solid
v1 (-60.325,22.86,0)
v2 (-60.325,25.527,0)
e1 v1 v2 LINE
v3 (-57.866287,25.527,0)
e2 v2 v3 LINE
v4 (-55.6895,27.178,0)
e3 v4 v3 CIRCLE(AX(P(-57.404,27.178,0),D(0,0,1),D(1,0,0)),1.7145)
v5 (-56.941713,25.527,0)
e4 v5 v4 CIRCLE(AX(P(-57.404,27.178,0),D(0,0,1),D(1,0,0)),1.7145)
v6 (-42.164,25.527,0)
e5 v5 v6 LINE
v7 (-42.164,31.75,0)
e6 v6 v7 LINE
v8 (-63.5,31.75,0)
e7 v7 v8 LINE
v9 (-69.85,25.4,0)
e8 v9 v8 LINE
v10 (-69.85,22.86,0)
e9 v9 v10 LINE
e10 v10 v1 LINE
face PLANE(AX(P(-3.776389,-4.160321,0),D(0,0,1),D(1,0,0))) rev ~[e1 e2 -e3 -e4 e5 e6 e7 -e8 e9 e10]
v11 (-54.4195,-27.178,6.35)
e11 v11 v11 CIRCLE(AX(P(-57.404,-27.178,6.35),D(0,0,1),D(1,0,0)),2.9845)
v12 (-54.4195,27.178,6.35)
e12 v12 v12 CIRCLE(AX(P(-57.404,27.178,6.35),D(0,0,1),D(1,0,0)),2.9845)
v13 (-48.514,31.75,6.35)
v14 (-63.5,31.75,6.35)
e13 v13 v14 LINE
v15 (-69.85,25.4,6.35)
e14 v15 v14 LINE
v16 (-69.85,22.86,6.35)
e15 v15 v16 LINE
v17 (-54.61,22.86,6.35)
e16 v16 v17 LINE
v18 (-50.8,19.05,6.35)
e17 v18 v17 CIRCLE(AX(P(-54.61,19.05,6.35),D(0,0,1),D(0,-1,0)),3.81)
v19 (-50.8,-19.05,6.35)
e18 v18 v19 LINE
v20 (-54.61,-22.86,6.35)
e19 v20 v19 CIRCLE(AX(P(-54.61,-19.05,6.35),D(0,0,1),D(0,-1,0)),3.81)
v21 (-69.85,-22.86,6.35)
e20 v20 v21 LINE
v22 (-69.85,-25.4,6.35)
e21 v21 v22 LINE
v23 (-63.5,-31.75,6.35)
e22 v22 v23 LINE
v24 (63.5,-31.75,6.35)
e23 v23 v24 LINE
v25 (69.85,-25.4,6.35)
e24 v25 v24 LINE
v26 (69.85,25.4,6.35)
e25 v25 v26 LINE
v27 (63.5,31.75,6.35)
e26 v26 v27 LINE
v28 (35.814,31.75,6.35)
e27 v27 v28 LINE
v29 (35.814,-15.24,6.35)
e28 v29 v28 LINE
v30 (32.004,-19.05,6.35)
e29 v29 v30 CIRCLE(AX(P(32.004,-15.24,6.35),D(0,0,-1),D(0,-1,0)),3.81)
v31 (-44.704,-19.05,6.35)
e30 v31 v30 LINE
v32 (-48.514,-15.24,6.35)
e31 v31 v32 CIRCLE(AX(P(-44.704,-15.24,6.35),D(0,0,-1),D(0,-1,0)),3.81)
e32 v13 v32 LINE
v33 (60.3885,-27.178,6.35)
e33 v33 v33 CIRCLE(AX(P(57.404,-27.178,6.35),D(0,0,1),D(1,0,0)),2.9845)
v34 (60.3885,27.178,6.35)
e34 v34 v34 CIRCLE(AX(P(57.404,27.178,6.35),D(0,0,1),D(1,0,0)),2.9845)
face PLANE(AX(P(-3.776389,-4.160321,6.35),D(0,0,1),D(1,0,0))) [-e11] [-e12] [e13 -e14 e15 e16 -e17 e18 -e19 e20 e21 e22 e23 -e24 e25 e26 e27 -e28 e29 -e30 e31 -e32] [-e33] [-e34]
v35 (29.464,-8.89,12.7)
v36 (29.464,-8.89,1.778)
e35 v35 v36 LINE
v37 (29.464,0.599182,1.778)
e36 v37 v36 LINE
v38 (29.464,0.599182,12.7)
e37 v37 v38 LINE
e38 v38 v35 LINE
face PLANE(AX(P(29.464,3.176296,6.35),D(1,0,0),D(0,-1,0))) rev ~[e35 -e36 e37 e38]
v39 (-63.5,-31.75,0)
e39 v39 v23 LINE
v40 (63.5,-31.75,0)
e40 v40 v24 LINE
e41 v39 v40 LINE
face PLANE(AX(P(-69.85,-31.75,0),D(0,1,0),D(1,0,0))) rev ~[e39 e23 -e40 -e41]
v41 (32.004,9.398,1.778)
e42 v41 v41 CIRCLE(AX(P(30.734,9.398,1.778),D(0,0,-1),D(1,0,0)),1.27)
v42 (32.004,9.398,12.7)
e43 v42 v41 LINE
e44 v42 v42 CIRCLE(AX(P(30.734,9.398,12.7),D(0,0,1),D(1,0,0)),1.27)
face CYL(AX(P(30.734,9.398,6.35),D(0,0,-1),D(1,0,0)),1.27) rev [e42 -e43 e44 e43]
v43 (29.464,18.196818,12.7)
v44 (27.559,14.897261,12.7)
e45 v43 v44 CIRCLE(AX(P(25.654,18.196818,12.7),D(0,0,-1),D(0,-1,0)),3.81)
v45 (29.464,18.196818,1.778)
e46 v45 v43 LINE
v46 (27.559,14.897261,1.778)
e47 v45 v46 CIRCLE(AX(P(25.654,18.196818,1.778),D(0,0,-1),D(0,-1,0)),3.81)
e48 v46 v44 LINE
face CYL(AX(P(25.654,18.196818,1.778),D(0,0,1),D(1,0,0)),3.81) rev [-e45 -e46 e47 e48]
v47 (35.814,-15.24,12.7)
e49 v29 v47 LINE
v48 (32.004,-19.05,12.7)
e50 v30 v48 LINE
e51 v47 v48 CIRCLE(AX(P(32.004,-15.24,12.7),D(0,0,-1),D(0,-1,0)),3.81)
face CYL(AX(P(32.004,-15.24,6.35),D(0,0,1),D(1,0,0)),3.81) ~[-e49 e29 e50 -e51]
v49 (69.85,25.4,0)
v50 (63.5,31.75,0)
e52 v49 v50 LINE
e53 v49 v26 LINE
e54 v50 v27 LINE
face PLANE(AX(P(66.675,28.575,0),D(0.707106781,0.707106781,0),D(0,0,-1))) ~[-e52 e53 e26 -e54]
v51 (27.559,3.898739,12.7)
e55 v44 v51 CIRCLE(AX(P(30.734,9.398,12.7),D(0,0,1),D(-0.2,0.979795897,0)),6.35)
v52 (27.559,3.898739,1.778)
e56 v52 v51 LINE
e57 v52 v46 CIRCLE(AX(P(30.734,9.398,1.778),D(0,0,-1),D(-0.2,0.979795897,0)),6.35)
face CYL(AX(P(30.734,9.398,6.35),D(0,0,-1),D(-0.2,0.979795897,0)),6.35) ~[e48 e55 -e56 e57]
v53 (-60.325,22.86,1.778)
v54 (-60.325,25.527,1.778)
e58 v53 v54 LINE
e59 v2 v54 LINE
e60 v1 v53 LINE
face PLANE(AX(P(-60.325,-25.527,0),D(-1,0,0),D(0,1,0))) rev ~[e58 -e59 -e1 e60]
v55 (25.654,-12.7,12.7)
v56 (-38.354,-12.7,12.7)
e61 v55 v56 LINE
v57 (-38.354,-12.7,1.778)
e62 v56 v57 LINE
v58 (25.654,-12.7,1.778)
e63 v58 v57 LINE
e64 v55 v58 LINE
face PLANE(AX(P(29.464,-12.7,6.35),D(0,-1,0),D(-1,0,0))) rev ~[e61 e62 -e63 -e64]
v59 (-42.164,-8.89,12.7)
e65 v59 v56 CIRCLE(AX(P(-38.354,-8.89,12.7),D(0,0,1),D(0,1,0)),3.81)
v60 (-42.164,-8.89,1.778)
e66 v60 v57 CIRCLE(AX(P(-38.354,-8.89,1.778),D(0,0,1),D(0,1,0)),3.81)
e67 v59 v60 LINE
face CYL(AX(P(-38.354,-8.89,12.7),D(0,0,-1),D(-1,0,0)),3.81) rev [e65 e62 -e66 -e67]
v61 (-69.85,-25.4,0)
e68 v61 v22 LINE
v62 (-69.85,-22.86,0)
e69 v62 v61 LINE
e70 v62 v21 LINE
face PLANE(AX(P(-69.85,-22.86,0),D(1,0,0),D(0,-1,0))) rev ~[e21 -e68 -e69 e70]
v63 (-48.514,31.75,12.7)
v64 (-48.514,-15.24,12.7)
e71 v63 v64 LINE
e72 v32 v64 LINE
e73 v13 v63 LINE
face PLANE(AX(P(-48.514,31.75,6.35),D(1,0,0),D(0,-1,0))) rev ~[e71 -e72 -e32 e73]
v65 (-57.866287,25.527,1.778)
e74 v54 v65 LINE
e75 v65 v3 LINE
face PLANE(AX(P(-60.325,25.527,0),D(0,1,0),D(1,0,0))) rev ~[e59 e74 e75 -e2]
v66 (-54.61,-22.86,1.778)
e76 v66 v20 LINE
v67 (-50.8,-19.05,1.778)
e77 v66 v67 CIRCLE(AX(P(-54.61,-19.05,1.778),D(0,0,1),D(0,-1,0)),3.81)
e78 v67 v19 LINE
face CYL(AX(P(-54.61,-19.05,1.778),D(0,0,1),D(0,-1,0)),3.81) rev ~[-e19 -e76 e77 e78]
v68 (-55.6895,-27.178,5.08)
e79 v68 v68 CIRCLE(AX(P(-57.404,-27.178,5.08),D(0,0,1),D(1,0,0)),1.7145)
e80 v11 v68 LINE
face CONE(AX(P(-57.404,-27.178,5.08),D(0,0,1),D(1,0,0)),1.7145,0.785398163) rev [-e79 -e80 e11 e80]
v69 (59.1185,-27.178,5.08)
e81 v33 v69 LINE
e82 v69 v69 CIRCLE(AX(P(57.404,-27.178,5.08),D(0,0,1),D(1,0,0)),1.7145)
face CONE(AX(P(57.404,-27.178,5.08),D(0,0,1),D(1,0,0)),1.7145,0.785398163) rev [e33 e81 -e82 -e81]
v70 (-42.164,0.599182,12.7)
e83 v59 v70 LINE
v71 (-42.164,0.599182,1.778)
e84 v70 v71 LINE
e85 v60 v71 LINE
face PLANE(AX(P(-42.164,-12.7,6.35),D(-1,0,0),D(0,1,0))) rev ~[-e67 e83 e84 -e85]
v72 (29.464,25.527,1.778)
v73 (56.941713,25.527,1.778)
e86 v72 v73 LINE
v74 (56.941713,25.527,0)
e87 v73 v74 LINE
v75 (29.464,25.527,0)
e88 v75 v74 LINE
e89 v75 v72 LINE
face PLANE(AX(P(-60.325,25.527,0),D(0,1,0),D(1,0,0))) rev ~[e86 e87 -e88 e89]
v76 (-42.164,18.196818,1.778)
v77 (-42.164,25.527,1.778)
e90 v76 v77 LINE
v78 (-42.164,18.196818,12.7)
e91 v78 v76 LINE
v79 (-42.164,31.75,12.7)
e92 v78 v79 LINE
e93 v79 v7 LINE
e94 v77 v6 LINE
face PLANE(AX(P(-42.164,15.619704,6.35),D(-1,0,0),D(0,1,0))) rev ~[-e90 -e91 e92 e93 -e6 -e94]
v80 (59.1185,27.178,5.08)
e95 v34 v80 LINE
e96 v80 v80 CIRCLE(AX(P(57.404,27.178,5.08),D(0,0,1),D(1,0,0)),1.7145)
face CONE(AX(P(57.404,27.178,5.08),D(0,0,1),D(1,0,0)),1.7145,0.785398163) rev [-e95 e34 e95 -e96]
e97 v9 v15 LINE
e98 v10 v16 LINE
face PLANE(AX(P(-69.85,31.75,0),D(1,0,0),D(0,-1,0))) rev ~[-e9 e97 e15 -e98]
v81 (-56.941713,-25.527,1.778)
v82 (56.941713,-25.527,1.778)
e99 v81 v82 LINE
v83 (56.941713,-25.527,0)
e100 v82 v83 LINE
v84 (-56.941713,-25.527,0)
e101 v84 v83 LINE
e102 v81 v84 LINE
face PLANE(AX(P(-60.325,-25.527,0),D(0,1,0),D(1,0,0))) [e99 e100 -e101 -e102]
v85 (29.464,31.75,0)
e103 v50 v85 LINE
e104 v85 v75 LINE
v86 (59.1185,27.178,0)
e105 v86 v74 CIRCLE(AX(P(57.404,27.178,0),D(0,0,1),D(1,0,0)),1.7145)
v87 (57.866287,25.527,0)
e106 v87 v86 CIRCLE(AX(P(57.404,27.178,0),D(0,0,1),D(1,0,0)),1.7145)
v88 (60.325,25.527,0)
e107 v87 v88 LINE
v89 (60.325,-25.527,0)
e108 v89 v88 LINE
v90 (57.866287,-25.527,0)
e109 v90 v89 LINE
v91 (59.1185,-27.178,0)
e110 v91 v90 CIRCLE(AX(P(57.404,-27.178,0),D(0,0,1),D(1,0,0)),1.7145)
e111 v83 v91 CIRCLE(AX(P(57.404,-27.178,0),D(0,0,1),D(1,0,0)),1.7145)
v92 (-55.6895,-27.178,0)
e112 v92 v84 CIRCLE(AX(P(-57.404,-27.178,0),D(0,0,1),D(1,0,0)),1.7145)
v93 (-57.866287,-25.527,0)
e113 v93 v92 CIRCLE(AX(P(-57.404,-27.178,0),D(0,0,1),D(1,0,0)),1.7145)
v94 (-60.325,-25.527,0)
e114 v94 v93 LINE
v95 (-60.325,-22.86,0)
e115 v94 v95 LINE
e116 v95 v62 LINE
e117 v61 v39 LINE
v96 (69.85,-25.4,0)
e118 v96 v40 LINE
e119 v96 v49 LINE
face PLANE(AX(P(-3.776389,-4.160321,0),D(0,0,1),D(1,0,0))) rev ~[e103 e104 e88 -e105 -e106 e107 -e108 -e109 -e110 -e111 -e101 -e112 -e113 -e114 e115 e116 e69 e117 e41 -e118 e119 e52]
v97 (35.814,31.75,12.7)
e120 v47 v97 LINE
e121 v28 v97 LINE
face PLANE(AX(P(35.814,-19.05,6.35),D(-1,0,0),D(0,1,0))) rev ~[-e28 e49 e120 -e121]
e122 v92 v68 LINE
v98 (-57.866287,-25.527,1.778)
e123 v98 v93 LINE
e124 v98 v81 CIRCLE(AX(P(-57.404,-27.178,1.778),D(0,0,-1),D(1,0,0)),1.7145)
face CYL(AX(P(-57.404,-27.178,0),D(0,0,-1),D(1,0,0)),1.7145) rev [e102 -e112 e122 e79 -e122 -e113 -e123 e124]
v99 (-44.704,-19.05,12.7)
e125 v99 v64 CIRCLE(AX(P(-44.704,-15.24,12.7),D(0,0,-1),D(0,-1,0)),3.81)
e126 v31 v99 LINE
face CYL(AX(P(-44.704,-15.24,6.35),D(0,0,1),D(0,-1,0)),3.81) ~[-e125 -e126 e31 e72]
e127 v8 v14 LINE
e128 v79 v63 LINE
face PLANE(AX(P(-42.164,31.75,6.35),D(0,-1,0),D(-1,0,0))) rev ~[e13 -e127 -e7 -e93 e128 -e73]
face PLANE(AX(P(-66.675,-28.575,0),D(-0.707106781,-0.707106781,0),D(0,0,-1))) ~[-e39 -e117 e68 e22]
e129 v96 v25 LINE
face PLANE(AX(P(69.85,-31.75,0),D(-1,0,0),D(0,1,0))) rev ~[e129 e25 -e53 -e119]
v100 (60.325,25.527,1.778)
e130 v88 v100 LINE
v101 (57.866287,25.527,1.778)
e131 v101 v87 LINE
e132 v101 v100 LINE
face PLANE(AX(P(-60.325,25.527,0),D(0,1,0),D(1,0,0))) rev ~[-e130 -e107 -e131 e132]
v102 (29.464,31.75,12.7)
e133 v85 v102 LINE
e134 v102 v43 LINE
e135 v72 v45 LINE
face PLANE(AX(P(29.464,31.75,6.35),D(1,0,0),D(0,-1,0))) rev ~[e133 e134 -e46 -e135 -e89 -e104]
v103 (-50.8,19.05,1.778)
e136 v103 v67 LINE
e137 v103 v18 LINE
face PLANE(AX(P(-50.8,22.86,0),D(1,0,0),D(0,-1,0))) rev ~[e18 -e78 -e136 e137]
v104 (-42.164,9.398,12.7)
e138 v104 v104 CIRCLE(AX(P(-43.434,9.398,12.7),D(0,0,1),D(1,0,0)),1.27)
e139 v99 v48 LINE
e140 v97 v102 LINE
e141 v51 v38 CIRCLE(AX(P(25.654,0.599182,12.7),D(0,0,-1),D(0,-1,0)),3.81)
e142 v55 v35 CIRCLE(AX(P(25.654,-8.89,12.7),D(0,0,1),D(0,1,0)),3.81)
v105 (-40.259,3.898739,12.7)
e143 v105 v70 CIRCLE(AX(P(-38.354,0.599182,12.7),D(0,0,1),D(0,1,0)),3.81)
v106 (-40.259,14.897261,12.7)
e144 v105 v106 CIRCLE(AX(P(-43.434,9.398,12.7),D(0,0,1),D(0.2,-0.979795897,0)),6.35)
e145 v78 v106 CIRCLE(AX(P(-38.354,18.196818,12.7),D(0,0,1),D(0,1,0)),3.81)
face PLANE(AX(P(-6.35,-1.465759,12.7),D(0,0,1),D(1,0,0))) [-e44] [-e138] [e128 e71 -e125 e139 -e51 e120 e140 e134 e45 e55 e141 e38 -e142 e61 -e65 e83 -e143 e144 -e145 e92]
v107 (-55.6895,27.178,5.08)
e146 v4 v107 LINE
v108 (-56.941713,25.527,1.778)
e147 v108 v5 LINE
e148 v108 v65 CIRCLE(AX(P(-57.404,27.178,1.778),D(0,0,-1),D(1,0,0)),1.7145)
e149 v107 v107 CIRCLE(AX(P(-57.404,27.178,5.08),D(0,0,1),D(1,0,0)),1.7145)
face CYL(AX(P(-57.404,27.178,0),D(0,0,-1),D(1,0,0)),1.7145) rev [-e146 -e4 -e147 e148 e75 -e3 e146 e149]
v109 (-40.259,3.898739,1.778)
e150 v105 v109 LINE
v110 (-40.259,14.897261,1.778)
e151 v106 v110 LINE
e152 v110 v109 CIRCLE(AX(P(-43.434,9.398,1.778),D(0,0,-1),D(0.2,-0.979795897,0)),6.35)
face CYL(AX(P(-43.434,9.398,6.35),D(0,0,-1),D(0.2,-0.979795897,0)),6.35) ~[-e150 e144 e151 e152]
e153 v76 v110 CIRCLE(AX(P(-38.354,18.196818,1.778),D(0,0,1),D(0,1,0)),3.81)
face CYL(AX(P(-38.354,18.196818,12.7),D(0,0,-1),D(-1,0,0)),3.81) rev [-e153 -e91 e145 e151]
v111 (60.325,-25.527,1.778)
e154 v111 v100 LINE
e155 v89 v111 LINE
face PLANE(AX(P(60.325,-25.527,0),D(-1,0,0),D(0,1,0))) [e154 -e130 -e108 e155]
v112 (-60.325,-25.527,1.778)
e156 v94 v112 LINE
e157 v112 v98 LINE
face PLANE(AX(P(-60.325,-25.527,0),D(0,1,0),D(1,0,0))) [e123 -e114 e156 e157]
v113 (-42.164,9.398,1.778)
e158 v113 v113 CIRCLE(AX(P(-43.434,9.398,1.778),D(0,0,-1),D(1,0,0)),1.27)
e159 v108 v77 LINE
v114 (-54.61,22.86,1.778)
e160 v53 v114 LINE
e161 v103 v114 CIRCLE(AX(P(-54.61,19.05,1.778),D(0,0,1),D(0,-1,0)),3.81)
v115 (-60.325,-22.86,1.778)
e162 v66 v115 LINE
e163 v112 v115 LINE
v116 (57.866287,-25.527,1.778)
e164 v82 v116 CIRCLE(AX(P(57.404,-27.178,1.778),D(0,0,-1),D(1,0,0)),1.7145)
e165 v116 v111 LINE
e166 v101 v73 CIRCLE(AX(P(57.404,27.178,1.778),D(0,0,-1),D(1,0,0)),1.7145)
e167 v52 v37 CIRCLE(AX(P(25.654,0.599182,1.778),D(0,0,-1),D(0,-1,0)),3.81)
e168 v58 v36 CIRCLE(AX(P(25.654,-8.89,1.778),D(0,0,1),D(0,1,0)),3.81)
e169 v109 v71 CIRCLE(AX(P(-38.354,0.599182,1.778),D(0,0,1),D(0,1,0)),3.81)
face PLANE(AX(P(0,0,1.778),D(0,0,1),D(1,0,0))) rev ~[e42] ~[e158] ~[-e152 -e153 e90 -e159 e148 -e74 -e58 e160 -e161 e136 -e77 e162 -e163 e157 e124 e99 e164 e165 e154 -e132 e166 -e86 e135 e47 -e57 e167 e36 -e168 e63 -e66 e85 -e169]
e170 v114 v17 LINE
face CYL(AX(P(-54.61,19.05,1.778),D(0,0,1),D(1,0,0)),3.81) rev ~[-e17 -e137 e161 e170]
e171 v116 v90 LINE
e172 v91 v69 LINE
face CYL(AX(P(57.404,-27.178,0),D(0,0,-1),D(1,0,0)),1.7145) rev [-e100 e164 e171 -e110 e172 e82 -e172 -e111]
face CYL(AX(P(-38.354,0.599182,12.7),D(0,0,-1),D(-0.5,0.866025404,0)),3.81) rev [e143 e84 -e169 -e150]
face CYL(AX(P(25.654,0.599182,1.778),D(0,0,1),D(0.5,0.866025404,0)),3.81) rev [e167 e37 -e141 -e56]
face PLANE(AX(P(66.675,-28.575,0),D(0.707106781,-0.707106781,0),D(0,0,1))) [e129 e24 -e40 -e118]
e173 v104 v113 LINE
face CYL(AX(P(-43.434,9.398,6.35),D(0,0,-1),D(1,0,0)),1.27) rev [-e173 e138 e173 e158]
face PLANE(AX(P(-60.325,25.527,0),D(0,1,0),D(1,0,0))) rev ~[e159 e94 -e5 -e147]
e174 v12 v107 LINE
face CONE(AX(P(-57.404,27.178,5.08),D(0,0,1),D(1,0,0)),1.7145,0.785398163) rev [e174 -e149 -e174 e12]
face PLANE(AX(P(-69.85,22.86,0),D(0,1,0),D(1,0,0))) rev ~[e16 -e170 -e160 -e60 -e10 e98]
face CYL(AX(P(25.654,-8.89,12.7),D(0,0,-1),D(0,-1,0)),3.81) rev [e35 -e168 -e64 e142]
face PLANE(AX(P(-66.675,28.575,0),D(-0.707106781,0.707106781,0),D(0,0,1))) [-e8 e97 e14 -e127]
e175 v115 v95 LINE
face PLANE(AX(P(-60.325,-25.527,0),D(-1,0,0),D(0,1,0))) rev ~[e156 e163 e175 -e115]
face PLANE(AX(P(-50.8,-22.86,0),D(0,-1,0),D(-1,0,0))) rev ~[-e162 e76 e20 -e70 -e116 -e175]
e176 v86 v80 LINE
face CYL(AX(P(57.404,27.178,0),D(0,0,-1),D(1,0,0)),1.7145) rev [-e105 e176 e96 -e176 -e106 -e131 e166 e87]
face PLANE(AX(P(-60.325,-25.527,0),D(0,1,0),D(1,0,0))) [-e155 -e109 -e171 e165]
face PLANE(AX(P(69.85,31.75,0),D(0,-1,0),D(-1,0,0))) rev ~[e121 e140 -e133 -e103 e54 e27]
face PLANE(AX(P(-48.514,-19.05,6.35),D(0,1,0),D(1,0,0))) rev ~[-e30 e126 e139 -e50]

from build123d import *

# Parameters (mm, degrees)
F0_R     = 1.7145
F0_R_2   = 1.27
F1_DEPTH = 6.35
F2_W     = 120.65
F2_H     = 51.054
F3_DEPTH = 1.778
F4_R     = 1.27
F5_DEPTH = 6.35
F6_SIZE  = 6.35
F7_R     = 3.81
F8_SIZE  = 1.27


# Not quite as in the source:
# - a feature names something its author has since deleted; it is built from what else it names


with BuildPart() as f1:
    # F0 (on Top) → F1 (new body)
    with BuildSketch(Plane.XY):
        with BuildLine():
            Line((69.85, -31.75), (69.85, 31.75))
            Line((69.85, 31.75), (29.464, 31.75))
            Line((29.464, 31.75), (29.464, 15.6197039467))
            ThreePointArc((29.464, 15.6197039467), (24.384, 9.398), (29.464, 3.1762960533))
            Line((29.464, 3.1762960533), (29.464, -12.7))
            Line((29.464, -12.7), (-42.164, -12.7))
            Line((-42.164, -12.7), (-42.164, 3.1762960533))
            ThreePointArc((-42.164, 3.1762960533), (-37.084, 9.398), (-42.164, 15.6197039467))
            Line((-42.164, 15.6197039467), (-42.164, 31.75))
            Line((-42.164, 31.75), (-69.85, 31.75))
            Line((-69.85, 31.75), (-69.85, 22.86))
            Line((-69.85, 22.86), (-50.8, 22.86))
            Line((-50.8, 22.86), (-50.8, -22.86))
            Line((-50.8, -22.86), (-69.85, -22.86))
            Line((-69.85, -22.86), (-69.85, -31.75))
            Line((-69.85, -31.75), (69.85, -31.75))
        make_face()
        with Locations((-57.404, -27.178)):
            Circle(F0_R, mode=Mode.SUBTRACT)
        with Locations((57.404, -27.178)):
            Circle(F0_R, mode=Mode.SUBTRACT)
        with Locations((-43.434, 9.398)):
            Circle(F0_R_2, mode=Mode.SUBTRACT)
        with Locations((-57.404, 27.178)):
            Circle(F0_R, mode=Mode.SUBTRACT)
        with Locations((30.734, 9.398)):
            Circle(F0_R_2, mode=Mode.SUBTRACT)
        with Locations((57.404, 27.178)):
            Circle(F0_R, mode=Mode.SUBTRACT)
    extrude(amount=F1_DEPTH)

    # F2 (on Top) → F3 (cut)
    with BuildSketch(Plane.XY):
        Rectangle(F2_W, F2_H)
    extrude(amount=F3_DEPTH, mode=Mode.SUBTRACT)

    # F4 (on face) → F5 (join)
    with BuildSketch(Plane.XY.offset(6.35)):
        with BuildLine():
            Line((-48.514, 31.75), (-48.514, -19.05))
            Line((-48.514, -19.05), (35.814, -19.05))
            Line((35.814, -19.05), (35.814, 31.75))
            Line((35.814, 31.75), (29.464, 31.75))
            Line((29.464, 31.75), (29.464, 15.6197039467))
            ThreePointArc((29.464, 15.6197039467), (24.384, 9.398), (29.464, 3.1762960533))
            Line((29.464, 3.1762960533), (29.464, -12.7))
            Line((29.464, -12.7), (-42.164, -12.7))
            Line((-42.164, -12.7), (-42.164, 3.1762960533))
            ThreePointArc((-42.164, 3.1762960533), (-37.084, 9.398), (-42.164, 15.6197039467))
            Line((-42.164, 15.6197039467), (-42.164, 31.75))
            Line((-42.164, 31.75), (-48.514, 31.75))
        make_face()
        with Locations((-43.434, 9.398)):
            Circle(F4_R, mode=Mode.SUBTRACT)
        with Locations((30.734, 9.398)):
            Circle(F4_R, mode=Mode.SUBTRACT)
    extrude(amount=F5_DEPTH)

    # F6
    f6_edges = [f1.edges().sort_by_distance(p)[0] for p in [
        (-69.85, 31.75, 3.175),
        (69.85, 31.75, 3.175),
        (69.85, -31.75, 3.175),
        (-69.85, -31.75, 3.175),
    ]]
    chamfer(f6_edges, length=F6_SIZE)

    # F7
    f7_edges = [f1.edges().sort_by_distance(p)[0] for p in [
        (-50.8, 22.86, 4.064),
        (-50.8, -22.86, 4.064),
        (29.464, -12.7, 7.239),
        (-42.164, -12.7, 7.239),
        (29.464, 3.176296, 7.239),
        (29.464, 15.619704, 7.239),
        (-42.164, 15.619704, 7.239),
        (-42.164, 3.176296, 7.239),
        (-48.514, -19.05, 9.525),
        (35.814, -19.05, 9.525),
    ]]
    fillet(f7_edges, radius=F7_R)

    # F8
    f8_edges = [f1.edges().sort_by_distance(p)[0] for p in [
        (-59.1185, -27.178, 6.35),
        (-59.1185, 27.178, 6.35),
        (55.6895, 27.178, 6.35),
        (55.6895, -27.178, 6.35),
    ]]
    chamfer(f8_edges, length=F8_SIZE)


solid = f1.part
